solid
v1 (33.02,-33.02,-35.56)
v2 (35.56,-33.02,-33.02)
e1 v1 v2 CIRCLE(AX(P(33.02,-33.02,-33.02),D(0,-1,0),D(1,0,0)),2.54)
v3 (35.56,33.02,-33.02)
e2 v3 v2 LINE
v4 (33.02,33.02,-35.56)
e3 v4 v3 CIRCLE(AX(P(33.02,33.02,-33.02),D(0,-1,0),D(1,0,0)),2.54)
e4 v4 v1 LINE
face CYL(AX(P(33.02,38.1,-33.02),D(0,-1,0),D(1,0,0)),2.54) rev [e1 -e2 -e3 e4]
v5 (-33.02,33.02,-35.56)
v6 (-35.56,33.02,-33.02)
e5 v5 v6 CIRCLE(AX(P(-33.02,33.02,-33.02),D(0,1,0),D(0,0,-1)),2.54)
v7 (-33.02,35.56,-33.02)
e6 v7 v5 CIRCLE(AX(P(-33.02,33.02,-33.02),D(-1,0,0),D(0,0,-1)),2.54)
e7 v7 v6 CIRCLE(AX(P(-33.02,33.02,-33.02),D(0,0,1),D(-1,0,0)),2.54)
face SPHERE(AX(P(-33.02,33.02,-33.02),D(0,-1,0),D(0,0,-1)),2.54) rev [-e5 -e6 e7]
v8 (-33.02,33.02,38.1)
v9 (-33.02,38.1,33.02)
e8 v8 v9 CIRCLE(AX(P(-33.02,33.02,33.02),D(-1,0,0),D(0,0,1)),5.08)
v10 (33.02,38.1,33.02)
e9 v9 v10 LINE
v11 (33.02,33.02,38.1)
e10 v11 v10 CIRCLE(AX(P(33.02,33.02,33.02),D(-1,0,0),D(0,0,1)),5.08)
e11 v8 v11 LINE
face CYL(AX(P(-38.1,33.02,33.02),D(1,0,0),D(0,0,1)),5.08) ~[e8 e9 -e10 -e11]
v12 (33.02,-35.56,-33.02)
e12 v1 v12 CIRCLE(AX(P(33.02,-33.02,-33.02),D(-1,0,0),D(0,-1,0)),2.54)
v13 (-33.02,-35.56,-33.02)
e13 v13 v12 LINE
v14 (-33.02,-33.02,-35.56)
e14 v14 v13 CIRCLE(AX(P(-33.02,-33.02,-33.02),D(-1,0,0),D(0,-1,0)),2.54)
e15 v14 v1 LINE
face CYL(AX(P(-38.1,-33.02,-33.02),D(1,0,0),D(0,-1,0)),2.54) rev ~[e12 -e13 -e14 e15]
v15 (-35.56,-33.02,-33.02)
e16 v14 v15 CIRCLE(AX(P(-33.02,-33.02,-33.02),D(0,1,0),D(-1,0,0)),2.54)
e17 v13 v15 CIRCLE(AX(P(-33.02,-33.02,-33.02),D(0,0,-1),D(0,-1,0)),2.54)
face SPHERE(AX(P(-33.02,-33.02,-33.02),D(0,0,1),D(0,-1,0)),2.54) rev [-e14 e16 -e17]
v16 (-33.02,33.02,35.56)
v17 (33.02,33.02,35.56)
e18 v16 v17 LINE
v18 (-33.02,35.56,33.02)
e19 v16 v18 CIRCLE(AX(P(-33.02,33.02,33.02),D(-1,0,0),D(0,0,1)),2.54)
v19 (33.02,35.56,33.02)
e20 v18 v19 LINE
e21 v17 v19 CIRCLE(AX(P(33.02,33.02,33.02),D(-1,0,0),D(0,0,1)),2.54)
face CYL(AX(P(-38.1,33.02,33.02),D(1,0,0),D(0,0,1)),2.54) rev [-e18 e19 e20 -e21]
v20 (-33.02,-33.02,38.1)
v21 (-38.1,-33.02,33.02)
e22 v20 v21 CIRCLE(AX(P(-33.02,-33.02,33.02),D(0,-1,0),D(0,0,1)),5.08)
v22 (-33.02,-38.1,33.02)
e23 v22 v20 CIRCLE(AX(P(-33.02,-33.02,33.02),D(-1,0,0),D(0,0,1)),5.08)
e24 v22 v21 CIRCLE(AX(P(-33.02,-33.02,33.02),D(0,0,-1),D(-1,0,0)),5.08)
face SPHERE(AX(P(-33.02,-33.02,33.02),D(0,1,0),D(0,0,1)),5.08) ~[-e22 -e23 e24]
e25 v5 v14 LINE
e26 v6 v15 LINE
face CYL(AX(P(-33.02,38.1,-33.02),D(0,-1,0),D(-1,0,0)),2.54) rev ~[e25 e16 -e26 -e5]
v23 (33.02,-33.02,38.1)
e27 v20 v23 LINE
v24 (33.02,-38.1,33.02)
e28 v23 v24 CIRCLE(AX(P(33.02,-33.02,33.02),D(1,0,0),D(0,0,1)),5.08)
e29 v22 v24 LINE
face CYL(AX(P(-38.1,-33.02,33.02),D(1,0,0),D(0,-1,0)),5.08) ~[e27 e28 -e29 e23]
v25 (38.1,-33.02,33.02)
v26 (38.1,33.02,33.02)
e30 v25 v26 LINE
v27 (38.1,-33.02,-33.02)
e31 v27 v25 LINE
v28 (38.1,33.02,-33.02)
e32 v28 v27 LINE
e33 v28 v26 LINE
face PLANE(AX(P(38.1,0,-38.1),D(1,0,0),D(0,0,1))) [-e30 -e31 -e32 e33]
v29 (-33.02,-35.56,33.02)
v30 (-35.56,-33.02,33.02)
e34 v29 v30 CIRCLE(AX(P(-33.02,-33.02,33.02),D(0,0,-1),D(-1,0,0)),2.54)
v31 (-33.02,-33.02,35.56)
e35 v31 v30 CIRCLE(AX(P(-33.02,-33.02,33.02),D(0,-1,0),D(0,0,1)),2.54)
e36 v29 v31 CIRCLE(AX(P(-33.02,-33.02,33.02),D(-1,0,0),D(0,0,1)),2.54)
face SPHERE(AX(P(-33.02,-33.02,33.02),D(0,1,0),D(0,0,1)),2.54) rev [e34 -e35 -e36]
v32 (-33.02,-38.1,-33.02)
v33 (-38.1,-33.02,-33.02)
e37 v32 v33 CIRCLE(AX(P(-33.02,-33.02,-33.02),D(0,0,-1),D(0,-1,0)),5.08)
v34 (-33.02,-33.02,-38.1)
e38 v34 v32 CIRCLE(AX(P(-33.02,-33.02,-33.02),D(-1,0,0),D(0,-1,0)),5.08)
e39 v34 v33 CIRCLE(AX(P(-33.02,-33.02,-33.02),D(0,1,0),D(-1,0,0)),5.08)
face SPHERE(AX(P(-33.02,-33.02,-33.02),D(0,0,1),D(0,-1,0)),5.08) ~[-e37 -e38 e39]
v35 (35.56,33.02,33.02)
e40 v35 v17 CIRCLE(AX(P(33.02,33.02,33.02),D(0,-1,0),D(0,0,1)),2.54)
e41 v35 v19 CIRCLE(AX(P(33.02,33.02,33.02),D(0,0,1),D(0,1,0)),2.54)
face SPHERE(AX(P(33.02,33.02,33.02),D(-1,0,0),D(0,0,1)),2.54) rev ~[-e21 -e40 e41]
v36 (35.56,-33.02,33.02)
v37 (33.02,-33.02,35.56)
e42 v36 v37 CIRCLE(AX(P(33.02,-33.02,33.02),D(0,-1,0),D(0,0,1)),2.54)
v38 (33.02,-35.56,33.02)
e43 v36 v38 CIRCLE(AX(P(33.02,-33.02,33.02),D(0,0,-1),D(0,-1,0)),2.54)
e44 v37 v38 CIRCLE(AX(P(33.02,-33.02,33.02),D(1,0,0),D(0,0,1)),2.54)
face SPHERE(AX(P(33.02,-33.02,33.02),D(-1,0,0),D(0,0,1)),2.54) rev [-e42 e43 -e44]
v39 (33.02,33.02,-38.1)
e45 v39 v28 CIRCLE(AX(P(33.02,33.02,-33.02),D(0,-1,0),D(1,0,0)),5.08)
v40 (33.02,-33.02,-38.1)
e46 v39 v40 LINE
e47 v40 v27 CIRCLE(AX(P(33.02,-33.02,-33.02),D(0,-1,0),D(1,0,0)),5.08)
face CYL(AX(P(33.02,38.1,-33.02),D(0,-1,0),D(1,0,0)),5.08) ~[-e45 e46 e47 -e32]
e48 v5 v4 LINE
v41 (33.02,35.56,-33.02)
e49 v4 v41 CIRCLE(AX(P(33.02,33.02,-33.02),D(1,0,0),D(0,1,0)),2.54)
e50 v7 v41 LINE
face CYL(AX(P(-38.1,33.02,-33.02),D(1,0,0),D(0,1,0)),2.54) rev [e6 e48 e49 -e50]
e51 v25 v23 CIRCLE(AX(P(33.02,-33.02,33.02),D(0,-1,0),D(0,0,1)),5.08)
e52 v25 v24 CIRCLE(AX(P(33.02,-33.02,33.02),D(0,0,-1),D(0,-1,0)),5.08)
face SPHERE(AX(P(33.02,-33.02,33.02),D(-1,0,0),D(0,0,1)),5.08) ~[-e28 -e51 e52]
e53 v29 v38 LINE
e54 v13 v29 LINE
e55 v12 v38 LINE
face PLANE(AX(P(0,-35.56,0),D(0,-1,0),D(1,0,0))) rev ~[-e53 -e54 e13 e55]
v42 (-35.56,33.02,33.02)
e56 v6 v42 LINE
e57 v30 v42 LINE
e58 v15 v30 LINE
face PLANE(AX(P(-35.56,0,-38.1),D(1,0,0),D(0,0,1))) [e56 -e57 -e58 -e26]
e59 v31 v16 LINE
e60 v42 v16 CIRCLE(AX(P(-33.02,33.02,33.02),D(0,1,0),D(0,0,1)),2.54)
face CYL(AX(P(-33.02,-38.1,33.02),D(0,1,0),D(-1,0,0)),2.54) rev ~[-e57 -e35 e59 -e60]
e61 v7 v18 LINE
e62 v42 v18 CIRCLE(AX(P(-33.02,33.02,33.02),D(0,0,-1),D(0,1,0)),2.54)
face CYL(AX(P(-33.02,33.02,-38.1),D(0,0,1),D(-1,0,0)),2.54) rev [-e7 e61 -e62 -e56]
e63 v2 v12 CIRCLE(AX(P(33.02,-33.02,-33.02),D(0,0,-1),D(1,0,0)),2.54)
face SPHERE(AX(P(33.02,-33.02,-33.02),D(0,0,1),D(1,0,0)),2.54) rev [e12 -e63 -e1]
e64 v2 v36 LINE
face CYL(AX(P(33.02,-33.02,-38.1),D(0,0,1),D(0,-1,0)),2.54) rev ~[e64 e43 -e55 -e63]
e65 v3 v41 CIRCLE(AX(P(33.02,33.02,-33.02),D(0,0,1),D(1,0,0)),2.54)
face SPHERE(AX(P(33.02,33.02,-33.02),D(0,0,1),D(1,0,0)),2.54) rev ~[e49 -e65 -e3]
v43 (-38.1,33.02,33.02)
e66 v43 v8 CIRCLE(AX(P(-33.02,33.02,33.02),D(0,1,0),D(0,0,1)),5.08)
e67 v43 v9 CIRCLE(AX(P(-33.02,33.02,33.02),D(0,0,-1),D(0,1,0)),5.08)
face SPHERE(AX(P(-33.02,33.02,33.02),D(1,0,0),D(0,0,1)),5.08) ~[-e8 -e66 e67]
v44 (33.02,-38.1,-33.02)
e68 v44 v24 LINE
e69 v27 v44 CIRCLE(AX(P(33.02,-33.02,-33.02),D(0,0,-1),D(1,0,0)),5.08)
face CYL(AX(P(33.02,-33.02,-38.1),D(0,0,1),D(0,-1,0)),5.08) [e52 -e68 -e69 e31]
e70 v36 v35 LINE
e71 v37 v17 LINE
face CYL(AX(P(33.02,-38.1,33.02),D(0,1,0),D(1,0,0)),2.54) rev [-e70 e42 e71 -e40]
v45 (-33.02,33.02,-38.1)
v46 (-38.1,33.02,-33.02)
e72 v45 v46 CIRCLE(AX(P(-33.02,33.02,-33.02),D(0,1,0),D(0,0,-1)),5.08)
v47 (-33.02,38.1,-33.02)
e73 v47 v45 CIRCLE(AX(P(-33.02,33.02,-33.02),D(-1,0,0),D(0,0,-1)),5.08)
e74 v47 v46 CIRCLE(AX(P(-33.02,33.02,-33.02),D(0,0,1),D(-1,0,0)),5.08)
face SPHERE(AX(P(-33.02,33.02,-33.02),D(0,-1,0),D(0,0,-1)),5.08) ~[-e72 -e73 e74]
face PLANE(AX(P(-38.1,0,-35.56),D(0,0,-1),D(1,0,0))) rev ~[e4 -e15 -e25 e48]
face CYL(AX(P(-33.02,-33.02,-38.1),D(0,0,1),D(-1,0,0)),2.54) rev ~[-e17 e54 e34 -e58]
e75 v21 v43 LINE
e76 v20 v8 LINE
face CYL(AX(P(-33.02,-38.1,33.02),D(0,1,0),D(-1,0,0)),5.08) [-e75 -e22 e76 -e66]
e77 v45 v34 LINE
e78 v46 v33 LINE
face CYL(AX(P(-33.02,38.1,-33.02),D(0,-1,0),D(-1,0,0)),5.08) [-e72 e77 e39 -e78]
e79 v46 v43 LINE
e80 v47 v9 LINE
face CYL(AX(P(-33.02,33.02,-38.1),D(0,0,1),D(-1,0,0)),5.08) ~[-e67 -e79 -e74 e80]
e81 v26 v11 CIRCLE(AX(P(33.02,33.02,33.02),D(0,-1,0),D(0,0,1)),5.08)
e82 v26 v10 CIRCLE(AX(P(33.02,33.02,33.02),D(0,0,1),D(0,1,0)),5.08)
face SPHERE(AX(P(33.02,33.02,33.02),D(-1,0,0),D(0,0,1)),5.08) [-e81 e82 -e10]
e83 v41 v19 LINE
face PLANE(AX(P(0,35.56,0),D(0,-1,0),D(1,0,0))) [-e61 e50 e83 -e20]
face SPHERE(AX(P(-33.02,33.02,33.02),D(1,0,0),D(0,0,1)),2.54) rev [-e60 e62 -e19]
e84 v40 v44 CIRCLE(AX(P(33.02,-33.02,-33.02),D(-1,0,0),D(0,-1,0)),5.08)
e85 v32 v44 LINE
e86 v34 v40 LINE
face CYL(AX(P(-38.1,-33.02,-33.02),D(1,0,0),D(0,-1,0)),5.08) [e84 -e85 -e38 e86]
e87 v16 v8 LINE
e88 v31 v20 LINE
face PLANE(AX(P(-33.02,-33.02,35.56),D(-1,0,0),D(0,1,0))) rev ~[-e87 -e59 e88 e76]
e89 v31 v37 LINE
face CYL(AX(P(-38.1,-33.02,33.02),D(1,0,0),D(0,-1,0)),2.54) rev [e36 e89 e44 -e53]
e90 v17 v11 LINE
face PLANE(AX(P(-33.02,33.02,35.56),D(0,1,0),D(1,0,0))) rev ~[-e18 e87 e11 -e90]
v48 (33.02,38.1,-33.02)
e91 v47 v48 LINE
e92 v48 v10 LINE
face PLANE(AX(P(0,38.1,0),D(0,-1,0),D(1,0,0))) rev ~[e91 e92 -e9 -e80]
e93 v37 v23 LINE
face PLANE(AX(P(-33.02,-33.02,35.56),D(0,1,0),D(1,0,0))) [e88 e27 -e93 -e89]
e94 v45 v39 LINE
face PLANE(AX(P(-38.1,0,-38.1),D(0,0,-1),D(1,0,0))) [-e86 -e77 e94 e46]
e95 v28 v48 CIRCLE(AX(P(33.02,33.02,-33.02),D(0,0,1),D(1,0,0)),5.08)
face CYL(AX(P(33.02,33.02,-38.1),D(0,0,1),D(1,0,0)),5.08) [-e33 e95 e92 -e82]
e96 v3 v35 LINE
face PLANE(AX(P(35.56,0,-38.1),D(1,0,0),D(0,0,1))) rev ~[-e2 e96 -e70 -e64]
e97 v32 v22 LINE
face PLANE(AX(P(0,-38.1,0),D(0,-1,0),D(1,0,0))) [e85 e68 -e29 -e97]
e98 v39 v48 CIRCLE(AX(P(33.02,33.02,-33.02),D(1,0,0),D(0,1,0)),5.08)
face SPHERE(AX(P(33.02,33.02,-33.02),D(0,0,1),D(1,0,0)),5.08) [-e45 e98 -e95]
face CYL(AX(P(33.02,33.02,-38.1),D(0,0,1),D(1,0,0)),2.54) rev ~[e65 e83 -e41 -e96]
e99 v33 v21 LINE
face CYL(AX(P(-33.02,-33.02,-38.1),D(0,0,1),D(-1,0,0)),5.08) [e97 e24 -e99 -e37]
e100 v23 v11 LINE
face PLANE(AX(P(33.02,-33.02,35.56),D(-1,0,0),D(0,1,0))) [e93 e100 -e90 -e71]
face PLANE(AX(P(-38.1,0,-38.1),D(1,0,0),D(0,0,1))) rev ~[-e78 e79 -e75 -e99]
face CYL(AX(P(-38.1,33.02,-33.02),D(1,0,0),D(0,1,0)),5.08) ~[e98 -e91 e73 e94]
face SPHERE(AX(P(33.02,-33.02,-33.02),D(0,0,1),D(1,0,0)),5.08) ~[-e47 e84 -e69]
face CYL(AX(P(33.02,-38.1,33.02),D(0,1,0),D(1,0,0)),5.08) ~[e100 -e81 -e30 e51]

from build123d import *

# Parameters (mm, degrees)
F0_W     = 76.2
F0_H     = 76.2
F1_DEPTH = 38.1
F2_R     = 5.08
F3_T     = -2.54


# Not quite as in the source:
# - a shell that OpenCascade refuses in one call is made with other operations: the cavity is built on its own and cut out


with BuildPart() as f1:
    # F0 (on Front) → F1 (new body, symmetric)
    with BuildSketch(Plane.XZ):
        Rectangle(F0_W, F0_H)
    extrude(amount=F1_DEPTH, both=True)

    # F2
    f2_edges = [f1.edges().sort_by_distance(p)[0] for p in [
        (0, 38.1, 38.1),
        (-38.1, 0, 38.1),
        (0, -38.1, 38.1),
        (38.1, 0, 38.1),
        (38.1, 38.1, 0),
        (38.1, -38.1, 0),
        (38.1, 0, -38.1),
        (-38.1, -38.1, 0),
        (0, -38.1, -38.1),
        (-38.1, 0, -38.1),
        (0, 38.1, -38.1),
        (-38.1, 38.1, 0),
    ]]
    fillet(f2_edges, radius=F2_R)

    # F3: a shell. OpenCascade refuses it in one call, so the cavity is built on its own and cut out:
    # the body offset inwards by the wall thickness, plus a prism from it out through each open face.
    f3_core = offset(f1.part, amount=F3_T, mode=Mode.PRIVATE)
    f3_exits = [f3_core.faces().sort_by_distance(p)[0] for p in [
        (0, 0, 35.56),
    ]]
    add(f3_core, mode=Mode.SUBTRACT)
    extrude(f3_exits, amount=-F3_T, mode=Mode.SUBTRACT)


solid = f1.part
